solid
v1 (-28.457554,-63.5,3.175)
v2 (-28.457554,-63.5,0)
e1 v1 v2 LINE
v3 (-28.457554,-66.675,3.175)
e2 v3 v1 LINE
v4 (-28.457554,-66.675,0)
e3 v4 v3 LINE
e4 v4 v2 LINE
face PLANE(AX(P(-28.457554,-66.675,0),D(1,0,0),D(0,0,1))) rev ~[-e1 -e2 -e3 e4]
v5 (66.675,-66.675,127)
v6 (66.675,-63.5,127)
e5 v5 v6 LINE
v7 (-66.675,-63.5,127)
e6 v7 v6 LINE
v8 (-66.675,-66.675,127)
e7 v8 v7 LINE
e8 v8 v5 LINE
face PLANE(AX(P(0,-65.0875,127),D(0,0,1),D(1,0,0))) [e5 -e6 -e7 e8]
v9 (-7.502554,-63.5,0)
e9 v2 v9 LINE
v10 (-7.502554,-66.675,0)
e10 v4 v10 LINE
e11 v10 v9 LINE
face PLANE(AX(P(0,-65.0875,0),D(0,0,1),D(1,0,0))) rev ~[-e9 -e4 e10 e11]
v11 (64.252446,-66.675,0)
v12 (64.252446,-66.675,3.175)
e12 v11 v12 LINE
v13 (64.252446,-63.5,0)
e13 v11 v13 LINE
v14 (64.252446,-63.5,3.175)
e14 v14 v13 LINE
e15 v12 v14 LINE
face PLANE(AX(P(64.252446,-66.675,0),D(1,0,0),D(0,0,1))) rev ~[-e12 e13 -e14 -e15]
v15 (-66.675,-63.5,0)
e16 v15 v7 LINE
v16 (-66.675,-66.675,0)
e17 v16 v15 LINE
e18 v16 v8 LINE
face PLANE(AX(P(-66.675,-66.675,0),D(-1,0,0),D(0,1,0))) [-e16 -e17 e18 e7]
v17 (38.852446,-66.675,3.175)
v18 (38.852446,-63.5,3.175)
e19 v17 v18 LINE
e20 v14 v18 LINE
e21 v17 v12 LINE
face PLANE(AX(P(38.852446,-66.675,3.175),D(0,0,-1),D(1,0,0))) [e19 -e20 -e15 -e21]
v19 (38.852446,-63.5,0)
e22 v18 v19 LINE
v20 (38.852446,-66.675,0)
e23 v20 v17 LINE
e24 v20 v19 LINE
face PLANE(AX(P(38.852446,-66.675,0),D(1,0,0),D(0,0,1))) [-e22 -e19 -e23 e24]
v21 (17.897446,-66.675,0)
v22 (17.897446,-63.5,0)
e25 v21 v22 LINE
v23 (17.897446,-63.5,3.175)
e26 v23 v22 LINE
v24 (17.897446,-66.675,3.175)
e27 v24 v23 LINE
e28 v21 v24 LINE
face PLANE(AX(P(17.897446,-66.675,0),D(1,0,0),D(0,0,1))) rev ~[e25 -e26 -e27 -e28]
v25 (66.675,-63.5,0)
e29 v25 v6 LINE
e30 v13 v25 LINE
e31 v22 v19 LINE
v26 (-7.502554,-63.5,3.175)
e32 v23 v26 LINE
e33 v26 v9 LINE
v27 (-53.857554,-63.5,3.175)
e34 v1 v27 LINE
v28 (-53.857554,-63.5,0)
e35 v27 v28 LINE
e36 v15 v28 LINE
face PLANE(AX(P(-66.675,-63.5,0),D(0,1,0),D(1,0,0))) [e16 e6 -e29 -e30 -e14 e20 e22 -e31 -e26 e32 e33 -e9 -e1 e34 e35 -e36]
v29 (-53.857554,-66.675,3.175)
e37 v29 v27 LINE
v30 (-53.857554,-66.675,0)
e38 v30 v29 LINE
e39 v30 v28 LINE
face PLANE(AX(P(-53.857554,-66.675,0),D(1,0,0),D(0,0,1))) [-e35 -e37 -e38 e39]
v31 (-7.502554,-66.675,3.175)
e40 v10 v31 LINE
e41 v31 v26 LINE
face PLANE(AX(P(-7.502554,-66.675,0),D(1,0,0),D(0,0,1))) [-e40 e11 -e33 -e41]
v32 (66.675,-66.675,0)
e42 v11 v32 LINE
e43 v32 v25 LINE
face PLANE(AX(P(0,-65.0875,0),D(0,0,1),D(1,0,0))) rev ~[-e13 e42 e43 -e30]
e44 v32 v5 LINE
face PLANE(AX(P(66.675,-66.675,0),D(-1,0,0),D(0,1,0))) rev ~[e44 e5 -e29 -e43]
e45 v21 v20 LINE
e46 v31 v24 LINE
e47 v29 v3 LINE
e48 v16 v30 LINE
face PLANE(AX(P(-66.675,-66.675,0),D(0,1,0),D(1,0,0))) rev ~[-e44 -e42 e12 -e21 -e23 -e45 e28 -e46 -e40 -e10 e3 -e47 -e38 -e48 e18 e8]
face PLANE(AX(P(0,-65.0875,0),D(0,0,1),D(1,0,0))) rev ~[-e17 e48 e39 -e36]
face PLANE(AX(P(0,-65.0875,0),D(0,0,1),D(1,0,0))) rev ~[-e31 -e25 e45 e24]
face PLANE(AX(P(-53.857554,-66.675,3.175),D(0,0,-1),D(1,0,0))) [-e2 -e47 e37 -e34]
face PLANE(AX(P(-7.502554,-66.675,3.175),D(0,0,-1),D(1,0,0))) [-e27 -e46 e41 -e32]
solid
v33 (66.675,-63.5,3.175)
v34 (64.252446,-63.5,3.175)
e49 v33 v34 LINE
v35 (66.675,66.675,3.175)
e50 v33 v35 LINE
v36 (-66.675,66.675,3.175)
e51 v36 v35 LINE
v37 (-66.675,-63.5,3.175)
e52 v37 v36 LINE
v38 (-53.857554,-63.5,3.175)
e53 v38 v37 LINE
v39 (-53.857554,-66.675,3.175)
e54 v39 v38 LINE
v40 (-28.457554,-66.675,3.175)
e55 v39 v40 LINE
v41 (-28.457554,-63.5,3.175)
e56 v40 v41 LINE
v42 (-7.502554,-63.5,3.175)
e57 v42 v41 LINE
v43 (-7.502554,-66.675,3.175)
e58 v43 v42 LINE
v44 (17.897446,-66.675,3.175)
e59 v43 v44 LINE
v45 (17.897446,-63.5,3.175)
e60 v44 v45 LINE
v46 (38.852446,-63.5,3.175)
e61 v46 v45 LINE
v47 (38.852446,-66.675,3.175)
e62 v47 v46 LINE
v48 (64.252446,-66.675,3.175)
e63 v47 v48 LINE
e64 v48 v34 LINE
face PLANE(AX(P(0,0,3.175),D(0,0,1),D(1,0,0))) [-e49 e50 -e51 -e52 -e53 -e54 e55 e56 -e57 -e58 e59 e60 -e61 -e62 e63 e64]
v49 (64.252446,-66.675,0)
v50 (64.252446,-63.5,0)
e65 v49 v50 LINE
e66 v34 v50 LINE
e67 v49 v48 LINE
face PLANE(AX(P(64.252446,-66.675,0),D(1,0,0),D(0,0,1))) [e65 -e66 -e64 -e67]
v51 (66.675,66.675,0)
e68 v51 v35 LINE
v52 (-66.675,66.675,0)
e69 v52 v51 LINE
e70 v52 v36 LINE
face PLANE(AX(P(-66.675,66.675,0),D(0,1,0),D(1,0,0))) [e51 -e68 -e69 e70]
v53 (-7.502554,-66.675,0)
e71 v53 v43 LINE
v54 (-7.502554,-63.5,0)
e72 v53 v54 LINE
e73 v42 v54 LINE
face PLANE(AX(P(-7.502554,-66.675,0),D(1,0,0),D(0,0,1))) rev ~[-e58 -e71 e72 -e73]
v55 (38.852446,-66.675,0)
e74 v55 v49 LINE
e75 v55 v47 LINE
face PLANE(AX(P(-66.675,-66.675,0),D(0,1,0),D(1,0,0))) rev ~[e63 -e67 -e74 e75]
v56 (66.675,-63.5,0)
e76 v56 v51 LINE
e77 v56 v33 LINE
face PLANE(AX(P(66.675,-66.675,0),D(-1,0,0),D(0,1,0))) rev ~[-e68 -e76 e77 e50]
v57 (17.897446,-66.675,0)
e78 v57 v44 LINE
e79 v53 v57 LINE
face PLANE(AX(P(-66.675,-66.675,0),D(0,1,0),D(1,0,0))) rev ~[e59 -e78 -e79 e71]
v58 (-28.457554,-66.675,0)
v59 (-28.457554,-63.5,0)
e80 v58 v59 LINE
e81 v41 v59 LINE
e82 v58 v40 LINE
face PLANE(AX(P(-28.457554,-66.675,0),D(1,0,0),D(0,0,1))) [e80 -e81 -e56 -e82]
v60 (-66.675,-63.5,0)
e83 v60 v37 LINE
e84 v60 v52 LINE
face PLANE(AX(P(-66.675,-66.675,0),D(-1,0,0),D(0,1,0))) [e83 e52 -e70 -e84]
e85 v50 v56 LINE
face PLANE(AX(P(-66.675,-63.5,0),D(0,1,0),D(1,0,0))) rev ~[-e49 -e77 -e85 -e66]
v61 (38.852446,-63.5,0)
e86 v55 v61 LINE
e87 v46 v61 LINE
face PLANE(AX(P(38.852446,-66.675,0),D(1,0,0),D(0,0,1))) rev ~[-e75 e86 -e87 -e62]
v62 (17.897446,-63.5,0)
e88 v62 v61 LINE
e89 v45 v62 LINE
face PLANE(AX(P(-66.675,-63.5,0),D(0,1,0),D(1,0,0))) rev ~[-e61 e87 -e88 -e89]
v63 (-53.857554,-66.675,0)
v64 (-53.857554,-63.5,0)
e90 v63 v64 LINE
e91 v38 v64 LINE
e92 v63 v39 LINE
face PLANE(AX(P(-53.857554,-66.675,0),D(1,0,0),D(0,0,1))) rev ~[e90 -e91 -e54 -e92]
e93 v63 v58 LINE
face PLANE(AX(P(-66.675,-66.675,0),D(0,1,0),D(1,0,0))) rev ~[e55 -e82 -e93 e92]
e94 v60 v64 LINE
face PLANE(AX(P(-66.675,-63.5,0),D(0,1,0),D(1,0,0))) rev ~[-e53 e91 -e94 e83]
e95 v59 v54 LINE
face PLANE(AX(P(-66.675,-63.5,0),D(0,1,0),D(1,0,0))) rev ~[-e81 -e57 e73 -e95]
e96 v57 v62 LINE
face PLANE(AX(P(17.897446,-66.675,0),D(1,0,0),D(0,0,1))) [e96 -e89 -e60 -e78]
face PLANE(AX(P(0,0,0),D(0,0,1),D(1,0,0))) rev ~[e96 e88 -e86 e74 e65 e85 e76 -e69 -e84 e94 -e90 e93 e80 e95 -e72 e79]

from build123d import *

# Parameters (mm, degrees)
F0_W     = 133.35
F0_H     = 133.35
F1_DEPTH = 3.175
F2_W     = 133.35
F2_H     = 3.175
F3_DEPTH = 127
F4_W     = 25.4
F4_H     = 3.175
F5_DEPTH = 25.4


with BuildPart() as f1:
    # F0 (on Top) → F1 (new body)
    with BuildSketch(Plane.XY):
        Rectangle(F0_W, F0_H)
    extrude(amount=F1_DEPTH)


with BuildPart() as f3:
    # F2 (on Top) → F3 (new body)
    with BuildSketch(Plane.XY):
        with Locations((0, -65.0875)):
            Rectangle(F2_W, F2_H)
    extrude(amount=F3_DEPTH)

    # F4 (on face) → F5 (cut)
    with BuildSketch(Plane.XZ.offset(66.675)):
        with Locations((-41.1575537503, 1.5875)):
            Rectangle(F4_W, F4_H)
        with Locations((5.1974462497, 1.5875)):
            Rectangle(F4_W, F4_H)
        with Locations((51.5524462497, 1.5875)):
            Rectangle(F4_W, F4_H)
    extrude(amount=-F5_DEPTH, mode=Mode.SUBTRACT)


with BuildPart() as f1_1:
    add(f1.part)

    # F6: cut F3
    add(f3.part, mode=Mode.SUBTRACT)


solid = Compound([f3.part, f1_1.part])
